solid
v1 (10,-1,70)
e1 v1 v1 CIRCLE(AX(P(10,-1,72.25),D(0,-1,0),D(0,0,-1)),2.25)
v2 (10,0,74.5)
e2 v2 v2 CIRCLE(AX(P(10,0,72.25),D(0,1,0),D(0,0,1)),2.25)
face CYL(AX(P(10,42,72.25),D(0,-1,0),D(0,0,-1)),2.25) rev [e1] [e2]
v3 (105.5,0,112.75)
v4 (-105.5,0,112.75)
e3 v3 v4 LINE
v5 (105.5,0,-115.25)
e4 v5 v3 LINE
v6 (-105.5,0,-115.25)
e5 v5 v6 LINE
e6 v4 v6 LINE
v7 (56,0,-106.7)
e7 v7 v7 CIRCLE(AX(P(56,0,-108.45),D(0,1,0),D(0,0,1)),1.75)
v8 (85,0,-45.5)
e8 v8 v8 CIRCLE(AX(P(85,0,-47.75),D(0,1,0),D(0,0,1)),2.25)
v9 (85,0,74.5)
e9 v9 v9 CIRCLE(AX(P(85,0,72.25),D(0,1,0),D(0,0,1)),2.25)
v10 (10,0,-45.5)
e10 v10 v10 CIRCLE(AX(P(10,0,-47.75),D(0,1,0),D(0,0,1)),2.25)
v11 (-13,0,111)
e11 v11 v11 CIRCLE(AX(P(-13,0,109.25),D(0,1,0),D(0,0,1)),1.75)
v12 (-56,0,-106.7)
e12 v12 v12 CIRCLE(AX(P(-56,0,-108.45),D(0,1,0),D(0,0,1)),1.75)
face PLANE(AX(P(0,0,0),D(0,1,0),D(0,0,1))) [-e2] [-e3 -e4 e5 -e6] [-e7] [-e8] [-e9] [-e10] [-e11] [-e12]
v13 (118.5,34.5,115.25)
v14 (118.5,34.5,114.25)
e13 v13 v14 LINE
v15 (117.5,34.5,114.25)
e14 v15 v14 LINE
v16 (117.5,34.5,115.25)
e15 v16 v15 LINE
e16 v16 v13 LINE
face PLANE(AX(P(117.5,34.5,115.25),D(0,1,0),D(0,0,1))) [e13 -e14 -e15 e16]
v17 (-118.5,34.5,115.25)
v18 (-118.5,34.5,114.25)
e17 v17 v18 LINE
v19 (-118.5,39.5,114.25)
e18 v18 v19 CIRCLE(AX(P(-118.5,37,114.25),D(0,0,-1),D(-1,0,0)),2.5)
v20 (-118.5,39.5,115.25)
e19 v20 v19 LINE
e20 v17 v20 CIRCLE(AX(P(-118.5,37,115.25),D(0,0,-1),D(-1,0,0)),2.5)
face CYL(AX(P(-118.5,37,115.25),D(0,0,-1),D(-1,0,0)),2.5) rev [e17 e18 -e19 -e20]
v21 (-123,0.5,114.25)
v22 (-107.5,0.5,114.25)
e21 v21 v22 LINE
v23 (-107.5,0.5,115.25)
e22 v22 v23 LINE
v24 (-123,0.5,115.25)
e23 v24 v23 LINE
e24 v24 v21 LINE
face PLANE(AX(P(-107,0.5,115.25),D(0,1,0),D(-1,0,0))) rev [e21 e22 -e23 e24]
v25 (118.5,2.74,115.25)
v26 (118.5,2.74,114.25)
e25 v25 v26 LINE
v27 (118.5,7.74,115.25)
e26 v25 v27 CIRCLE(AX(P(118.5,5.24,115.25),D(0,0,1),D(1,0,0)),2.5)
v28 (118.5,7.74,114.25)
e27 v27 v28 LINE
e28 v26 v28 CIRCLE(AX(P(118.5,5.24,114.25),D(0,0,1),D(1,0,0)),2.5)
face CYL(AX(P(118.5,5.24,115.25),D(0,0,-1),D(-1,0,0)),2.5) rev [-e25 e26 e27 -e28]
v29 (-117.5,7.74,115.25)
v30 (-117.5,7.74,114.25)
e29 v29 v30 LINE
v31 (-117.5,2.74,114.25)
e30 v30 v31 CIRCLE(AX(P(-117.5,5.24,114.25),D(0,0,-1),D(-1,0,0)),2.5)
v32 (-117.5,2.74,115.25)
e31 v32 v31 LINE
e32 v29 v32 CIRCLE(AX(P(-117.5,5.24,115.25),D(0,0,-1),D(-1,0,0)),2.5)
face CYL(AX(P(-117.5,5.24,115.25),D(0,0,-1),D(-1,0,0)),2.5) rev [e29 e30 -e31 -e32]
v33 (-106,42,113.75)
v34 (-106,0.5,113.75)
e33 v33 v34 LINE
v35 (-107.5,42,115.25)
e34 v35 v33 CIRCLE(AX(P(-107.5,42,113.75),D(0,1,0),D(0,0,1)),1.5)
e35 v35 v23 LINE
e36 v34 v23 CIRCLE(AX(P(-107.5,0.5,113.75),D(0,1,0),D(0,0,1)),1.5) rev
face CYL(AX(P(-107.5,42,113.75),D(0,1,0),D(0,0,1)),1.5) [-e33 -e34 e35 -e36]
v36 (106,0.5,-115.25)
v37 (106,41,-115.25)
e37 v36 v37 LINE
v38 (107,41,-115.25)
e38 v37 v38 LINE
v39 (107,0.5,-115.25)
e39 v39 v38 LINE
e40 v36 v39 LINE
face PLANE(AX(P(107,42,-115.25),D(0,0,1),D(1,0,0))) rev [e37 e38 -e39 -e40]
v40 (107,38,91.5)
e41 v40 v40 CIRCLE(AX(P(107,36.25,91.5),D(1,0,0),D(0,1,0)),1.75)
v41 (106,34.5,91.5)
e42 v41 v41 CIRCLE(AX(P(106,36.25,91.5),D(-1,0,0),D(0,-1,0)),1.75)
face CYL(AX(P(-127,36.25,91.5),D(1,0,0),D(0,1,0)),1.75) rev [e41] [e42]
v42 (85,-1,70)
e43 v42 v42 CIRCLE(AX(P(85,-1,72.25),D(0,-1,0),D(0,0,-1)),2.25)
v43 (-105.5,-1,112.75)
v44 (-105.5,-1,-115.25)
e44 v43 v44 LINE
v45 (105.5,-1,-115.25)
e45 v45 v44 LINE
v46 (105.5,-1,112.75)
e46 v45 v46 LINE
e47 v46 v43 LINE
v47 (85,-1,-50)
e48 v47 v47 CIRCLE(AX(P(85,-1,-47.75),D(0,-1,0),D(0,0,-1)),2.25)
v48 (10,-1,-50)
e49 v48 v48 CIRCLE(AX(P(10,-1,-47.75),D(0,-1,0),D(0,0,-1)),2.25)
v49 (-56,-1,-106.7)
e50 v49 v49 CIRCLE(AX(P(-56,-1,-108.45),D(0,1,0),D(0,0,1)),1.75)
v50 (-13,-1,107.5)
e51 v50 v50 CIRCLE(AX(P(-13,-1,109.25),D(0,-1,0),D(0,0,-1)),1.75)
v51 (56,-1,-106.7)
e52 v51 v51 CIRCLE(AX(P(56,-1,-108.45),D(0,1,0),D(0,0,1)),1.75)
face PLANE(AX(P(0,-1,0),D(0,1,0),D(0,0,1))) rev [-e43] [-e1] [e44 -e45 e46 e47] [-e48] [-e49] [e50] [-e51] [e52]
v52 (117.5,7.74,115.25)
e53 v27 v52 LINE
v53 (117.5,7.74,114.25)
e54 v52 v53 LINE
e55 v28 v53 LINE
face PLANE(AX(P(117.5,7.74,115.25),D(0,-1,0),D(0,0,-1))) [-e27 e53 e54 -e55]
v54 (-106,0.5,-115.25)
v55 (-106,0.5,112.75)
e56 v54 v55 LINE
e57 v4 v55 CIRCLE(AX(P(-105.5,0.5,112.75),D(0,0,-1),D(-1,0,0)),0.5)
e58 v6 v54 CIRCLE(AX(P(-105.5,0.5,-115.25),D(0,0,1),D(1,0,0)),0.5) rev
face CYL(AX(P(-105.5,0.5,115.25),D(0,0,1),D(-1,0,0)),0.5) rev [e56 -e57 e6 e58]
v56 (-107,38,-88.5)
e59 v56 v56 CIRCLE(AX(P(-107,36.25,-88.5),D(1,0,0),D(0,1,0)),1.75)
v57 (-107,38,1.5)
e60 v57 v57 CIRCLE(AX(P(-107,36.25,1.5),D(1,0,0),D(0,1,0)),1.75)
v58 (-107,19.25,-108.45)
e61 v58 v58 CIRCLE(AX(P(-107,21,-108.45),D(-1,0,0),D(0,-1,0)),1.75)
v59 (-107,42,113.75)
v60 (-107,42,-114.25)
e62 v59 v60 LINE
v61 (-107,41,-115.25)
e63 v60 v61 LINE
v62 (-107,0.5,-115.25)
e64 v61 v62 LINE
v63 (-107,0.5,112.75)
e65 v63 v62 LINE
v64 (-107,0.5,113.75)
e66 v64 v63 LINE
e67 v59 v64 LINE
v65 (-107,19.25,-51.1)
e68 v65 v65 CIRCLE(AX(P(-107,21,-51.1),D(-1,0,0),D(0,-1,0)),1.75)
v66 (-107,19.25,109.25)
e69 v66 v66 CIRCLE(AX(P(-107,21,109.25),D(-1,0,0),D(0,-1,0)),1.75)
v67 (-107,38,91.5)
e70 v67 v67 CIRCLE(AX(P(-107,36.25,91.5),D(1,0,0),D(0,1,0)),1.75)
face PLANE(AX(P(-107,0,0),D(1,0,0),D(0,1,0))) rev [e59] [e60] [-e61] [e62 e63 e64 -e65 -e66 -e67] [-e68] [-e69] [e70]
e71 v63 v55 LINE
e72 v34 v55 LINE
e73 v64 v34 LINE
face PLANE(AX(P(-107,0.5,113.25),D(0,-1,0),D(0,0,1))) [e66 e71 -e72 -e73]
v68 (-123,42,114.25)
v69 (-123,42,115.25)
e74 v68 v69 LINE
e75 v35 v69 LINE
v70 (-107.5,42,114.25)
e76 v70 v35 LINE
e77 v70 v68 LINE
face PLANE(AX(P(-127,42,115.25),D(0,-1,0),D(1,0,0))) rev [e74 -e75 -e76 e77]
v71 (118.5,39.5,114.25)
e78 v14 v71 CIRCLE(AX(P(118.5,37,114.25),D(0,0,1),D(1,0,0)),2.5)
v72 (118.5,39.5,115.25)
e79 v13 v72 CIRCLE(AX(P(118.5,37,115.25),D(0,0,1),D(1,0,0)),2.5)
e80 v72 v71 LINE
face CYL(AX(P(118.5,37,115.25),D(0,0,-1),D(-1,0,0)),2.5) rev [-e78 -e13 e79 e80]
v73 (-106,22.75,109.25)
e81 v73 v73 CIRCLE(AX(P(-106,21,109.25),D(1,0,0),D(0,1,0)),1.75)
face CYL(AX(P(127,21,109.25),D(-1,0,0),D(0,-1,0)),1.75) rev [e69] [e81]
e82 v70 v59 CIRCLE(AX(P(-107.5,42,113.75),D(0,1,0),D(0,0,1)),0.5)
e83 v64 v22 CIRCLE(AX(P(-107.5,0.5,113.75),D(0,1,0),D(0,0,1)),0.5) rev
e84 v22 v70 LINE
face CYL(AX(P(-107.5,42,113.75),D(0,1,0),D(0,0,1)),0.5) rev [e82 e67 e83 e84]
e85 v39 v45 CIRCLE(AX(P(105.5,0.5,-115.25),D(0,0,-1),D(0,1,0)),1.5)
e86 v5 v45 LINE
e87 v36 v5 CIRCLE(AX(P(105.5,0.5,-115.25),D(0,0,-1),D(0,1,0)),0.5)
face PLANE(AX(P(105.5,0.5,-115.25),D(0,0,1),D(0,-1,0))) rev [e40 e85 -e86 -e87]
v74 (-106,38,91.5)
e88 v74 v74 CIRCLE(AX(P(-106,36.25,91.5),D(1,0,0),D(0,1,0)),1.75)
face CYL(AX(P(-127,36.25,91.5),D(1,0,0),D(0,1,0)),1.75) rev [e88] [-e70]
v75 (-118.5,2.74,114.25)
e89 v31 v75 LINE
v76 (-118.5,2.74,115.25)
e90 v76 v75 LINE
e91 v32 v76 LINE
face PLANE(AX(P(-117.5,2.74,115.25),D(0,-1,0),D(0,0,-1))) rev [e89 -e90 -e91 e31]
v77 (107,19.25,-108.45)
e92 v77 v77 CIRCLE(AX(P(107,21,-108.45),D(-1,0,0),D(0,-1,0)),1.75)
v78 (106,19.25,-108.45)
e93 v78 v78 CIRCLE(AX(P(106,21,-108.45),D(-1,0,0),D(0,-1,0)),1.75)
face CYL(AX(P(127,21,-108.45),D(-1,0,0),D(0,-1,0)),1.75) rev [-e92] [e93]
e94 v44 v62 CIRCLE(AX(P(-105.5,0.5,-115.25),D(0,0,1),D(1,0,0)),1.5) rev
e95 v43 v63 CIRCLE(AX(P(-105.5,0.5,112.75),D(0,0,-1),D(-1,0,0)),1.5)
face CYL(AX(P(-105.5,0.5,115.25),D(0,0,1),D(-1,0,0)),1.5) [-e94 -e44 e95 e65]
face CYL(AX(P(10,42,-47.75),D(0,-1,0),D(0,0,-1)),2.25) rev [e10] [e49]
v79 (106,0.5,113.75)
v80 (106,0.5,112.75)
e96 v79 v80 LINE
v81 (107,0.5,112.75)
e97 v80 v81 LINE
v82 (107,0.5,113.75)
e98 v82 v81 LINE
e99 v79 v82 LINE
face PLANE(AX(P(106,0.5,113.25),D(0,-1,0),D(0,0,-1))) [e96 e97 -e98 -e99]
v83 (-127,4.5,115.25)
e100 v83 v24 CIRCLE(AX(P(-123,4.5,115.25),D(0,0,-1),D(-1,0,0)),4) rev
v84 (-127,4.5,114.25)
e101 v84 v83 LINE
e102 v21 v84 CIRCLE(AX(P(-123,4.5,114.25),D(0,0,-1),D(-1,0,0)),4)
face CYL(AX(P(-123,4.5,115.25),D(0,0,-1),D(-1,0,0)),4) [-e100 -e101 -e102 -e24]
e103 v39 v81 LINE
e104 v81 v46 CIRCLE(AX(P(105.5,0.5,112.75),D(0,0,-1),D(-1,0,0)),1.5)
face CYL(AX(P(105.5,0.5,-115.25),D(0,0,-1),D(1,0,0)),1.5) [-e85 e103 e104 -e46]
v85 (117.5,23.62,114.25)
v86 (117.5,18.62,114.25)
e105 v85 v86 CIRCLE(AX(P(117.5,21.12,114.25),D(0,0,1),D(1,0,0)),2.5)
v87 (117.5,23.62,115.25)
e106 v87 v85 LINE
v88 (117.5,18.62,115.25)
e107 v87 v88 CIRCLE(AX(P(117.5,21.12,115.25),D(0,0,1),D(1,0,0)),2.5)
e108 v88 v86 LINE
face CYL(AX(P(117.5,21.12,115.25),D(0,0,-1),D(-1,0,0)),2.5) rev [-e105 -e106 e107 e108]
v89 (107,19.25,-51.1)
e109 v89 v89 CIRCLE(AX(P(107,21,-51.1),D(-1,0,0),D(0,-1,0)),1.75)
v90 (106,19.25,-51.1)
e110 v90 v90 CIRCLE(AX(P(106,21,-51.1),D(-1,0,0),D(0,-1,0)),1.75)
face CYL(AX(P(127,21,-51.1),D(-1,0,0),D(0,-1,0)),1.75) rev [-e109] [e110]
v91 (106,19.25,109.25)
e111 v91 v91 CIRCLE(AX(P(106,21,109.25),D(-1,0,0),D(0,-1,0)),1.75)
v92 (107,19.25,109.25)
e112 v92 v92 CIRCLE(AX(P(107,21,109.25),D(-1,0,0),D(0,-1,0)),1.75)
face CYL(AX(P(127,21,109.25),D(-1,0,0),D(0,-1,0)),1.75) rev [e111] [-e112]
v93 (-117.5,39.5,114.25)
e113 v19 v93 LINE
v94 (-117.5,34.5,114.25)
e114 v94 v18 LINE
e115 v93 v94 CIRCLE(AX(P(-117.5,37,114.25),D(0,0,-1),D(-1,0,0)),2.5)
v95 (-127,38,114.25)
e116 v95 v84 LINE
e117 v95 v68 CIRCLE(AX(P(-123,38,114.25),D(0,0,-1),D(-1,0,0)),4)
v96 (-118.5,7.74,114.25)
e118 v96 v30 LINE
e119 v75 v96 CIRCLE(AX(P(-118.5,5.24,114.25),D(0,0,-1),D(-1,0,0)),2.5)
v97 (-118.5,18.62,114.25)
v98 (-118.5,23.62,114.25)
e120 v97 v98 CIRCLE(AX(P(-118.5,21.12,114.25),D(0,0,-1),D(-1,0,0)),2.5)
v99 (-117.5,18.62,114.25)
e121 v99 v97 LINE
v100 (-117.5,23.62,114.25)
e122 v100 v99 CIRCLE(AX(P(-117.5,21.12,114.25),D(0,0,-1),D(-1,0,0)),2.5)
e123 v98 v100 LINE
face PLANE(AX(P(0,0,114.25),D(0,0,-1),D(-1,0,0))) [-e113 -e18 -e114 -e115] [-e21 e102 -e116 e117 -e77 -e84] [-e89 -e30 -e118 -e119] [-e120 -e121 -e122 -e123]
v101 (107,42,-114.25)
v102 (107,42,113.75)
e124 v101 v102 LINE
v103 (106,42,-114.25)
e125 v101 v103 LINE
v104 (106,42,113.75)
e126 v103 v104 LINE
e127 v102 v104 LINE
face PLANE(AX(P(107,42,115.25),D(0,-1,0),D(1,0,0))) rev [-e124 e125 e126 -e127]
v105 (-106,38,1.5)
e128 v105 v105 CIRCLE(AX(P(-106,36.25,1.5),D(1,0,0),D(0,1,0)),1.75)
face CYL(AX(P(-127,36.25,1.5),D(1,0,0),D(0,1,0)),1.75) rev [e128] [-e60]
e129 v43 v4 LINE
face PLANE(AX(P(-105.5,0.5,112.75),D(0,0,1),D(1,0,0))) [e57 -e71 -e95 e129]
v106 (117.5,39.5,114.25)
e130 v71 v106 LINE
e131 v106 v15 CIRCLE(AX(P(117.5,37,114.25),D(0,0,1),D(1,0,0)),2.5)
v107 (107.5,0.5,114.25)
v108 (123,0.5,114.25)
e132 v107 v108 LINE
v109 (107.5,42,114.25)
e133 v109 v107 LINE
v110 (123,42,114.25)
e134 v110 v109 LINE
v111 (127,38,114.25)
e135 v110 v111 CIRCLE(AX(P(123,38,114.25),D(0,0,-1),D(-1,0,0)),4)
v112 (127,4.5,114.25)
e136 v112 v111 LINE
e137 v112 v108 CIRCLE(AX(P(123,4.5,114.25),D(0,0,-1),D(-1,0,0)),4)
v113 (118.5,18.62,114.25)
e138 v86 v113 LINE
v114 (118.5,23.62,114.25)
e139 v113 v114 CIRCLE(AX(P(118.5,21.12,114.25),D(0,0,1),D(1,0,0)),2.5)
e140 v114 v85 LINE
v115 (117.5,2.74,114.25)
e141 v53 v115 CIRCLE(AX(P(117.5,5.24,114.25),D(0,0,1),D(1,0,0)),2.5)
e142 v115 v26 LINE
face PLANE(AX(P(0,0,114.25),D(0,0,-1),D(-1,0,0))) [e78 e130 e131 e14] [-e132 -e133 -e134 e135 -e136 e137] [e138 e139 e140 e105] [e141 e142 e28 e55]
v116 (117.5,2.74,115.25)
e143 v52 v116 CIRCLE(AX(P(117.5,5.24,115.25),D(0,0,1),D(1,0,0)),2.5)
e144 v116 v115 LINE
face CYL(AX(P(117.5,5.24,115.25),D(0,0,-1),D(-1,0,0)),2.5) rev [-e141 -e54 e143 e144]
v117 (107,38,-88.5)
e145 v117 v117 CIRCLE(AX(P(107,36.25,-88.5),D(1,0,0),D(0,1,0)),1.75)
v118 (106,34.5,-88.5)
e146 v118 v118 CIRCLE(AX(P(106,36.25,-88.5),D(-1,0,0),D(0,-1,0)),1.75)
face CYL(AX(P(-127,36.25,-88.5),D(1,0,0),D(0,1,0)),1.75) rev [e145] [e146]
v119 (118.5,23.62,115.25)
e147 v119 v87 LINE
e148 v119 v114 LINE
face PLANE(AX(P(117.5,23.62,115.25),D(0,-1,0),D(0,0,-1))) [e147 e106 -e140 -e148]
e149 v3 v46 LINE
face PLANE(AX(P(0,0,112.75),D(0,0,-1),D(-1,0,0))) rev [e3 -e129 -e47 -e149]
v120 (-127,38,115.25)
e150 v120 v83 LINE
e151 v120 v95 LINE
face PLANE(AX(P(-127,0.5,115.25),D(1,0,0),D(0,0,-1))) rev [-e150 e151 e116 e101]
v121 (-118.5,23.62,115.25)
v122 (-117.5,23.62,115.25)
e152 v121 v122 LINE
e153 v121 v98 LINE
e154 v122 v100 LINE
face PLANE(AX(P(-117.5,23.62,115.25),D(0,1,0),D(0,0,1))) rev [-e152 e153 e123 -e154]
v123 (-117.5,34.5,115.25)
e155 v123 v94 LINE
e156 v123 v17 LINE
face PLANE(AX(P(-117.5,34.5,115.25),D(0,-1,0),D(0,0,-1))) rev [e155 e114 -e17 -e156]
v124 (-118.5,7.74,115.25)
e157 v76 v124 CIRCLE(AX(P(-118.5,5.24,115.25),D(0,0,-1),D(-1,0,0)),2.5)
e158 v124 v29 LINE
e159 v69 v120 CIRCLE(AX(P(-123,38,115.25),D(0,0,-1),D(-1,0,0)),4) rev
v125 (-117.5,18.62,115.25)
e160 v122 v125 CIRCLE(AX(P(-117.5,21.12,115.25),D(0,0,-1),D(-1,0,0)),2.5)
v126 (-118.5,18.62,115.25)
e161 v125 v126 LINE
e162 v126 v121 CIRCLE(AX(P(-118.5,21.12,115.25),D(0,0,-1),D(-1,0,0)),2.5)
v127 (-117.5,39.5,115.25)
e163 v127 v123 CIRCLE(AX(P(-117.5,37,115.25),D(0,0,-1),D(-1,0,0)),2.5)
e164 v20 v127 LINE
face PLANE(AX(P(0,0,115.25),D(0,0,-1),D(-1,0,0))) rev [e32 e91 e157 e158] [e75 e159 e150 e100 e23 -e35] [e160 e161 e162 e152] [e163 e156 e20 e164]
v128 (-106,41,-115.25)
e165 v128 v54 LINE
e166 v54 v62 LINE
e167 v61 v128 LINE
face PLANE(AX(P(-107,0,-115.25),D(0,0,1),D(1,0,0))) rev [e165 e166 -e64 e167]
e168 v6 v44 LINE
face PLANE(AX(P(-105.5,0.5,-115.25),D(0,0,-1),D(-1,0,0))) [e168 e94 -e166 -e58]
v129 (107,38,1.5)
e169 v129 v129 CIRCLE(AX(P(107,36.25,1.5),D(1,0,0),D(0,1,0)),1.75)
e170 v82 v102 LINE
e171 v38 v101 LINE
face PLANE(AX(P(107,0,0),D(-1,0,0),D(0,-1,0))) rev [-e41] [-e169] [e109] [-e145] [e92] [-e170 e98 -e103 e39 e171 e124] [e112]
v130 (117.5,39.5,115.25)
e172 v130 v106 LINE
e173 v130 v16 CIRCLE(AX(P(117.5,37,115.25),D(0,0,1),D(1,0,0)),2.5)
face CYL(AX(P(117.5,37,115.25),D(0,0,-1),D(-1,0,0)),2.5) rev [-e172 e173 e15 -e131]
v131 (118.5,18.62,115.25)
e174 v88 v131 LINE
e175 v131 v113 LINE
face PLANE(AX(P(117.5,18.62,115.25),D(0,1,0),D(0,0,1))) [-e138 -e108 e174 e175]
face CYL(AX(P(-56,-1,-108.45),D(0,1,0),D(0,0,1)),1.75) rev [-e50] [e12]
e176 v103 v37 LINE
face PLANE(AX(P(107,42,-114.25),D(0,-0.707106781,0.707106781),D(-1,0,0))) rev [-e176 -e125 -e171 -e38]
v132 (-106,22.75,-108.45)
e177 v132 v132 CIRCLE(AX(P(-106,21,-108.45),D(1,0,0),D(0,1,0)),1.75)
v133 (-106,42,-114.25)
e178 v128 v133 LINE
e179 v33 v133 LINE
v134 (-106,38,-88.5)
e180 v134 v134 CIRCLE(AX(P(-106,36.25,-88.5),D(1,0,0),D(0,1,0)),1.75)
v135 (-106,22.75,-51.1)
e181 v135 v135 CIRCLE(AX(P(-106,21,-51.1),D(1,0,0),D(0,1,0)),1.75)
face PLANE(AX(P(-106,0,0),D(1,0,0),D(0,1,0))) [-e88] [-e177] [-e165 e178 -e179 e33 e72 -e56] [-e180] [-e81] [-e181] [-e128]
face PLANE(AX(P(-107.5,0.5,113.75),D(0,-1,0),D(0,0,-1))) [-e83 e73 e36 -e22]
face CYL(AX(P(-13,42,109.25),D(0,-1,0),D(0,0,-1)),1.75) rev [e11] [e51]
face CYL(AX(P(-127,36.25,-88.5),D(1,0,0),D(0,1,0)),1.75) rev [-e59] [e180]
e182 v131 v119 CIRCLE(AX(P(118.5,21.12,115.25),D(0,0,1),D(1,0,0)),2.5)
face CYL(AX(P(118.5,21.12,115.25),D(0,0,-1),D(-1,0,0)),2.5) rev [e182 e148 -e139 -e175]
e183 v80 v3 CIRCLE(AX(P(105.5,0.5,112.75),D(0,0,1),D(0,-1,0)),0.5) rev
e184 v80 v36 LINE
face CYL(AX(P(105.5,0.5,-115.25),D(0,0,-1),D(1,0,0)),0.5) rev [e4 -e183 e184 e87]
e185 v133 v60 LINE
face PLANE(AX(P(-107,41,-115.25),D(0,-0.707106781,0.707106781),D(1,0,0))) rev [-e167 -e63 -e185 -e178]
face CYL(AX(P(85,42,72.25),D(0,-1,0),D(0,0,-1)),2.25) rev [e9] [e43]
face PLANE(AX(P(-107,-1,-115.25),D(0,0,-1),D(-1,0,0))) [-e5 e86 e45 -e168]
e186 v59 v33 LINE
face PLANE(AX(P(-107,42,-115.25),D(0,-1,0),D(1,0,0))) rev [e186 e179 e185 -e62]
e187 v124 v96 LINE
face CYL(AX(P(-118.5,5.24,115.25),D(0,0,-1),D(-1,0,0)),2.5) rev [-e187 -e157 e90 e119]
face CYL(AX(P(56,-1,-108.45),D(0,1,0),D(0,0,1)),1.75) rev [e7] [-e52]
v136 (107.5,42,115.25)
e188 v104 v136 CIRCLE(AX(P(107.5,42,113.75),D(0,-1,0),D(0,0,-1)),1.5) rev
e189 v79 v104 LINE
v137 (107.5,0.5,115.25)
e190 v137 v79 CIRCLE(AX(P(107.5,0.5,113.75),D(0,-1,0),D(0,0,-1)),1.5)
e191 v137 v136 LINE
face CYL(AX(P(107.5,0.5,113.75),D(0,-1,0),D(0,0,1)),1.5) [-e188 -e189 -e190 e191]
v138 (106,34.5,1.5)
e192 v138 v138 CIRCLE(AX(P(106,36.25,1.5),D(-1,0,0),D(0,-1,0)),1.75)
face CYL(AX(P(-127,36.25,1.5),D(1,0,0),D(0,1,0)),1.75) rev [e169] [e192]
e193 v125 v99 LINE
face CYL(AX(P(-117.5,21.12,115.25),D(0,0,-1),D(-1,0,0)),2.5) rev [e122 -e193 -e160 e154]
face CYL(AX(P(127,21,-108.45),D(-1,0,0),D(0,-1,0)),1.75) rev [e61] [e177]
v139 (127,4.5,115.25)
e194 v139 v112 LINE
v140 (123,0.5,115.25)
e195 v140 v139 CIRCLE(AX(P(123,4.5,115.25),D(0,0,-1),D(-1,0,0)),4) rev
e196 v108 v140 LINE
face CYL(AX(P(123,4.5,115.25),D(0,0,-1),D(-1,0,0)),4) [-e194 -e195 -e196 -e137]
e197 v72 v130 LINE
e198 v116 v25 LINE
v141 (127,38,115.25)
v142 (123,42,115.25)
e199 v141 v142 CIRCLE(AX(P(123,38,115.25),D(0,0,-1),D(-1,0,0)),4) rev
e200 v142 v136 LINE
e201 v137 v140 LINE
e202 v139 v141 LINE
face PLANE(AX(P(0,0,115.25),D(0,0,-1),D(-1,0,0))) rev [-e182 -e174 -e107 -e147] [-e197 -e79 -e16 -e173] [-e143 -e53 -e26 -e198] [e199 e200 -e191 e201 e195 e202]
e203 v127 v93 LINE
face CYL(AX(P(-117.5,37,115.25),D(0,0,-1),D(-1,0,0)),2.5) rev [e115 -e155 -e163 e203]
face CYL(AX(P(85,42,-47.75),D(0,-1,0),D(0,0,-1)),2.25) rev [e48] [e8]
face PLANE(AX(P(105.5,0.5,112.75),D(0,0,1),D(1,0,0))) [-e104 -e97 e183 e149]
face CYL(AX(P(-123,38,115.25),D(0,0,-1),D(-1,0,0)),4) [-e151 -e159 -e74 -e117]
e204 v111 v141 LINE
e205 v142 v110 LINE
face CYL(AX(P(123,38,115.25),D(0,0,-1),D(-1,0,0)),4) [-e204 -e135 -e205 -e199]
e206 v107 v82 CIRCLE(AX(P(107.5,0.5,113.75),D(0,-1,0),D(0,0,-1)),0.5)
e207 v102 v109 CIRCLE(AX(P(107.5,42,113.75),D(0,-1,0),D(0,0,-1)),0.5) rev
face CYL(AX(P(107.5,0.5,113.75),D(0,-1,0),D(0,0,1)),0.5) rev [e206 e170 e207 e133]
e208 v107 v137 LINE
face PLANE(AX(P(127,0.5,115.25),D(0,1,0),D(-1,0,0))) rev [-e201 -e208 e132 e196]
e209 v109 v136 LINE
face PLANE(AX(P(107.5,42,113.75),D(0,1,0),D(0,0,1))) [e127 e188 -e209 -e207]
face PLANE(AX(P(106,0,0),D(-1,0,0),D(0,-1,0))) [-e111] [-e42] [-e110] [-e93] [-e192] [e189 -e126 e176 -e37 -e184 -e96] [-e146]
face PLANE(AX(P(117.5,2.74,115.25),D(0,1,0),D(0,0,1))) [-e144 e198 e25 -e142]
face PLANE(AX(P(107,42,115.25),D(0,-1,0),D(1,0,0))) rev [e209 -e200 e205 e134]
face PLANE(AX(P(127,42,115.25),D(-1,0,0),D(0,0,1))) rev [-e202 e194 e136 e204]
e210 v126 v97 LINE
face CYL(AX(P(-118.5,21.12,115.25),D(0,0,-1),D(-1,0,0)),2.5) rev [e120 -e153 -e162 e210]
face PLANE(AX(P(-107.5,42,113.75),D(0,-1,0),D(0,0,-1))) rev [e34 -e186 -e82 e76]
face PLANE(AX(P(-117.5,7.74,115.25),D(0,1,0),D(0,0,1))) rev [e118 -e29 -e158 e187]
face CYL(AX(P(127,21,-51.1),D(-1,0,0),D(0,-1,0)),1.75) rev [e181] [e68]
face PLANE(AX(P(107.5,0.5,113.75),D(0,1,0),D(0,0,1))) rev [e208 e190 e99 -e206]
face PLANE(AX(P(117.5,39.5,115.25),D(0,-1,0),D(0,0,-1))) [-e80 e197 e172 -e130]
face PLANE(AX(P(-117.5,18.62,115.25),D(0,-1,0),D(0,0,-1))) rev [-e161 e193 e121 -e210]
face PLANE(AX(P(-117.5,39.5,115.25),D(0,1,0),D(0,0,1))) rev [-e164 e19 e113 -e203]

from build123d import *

# Parameters (mm, degrees)
SKETCH1_W                    = 214
SKETCH1_H                    = 230.5
BASE_FLANGE1_DEPTH           = 1
EDGE_FLANGE3_STRIP_W         = 5
EDGE_FLANGE3_STRIP_H         = 1
EDGE_FLANGE3_STRIP_CUT_DEPTH = 230.5
EDGE_FLANGE3_DEPTH           = 230.5
EDGE_FLANGE4_STRIP_W         = 5
EDGE_FLANGE4_STRIP_H         = 1
EDGE_FLANGE4_STRIP_CUT_DEPTH = 230.5
EDGE_FLANGE4_DEPTH           = 230.5
EDGE_FLANGE5_STRIP_W         = 5
EDGE_FLANGE5_STRIP_H         = 1
EDGE_FLANGE5_STRIP_CUT_DEPTH = 41.5
EDGE_FLANGE5_DEPTH           = 41.5
EDGE_FLANGE6_STRIP_W         = 5
EDGE_FLANGE6_STRIP_H         = 1
EDGE_FLANGE6_STRIP_CUT_DEPTH = 41.5
EDGE_FLANGE6_DEPTH           = 41.5
FILLET1_R                    = 4
CUT_EXTRUDE1_REACH           = 178.807
SKETCH24_W                   = 214
SKETCH24_H                   = 2.5
SKETCH26_R                   = 2.5
CUT_EXTRUDE2_DEPTH           = 10
SKETCH27_R                   = 1.75
CUT_EXTRUDE3_DEPTH           = 265.201745831
SKETCH28_R                   = 2.25
CUT_EXTRUDE4_DEPTH           = 177.806568034
SKETCH29_R                   = 1.75
CUT_EXTRUDE5_DEPTH           = 177.566028726
SKETCH30_R                   = 1.75
CUT_EXTRUDE6_DEPTH           = 265.201745831
SKETCH31_R                   = 1.75
CUT_EXTRUDE7_DEPTH           = 265.201745831
CHAMFER1_SIZE                = 1
CUT_EXTRUDE8_DEPTH           = 266.637440885
SKETCH33_R                   = 1.75
CUT_EXTRUDE9_DEPTH           = 177.806568034
SKETCH34_R                   = 1.75
CUT_EXTRUDE10_DEPTH          = 265.201745831


# Sheet-metal steps are written as plain solids
with BuildPart() as part:
    # Sketch1 → Base-Flange1 (new body)
    with BuildSketch(Plane(origin=(0, 0, 0), x_dir=(1, 0, 0), z_dir=(0, 1, 0))):
        Rectangle(SKETCH1_W, SKETCH1_H)
    extrude(amount=-BASE_FLANGE1_DEPTH)

    # Edge-Flange3 strip (across the edge) → Edge-Flange3 strip cut (cut)
    with BuildSketch(Plane(origin=(-107, 0, -115.25), x_dir=(1, 0, 0), z_dir=(0, 0, 1))):
        with Locations((-1, -0.5)):
            Rectangle(EDGE_FLANGE3_STRIP_W, EDGE_FLANGE3_STRIP_H)
    extrude(amount=EDGE_FLANGE3_STRIP_CUT_DEPTH, mode=Mode.SUBTRACT)

    # Edge-Flange3 section (across the edge) → Edge-Flange3 (add)
    with BuildSketch(Plane(origin=(-107, 0, -115.25), x_dir=(1, 0, 0), z_dir=(0, 0, 1))):
        with BuildLine():
            Line((0, 0.5), (0, 42))
            Line((0, 42), (1, 42))
            Line((1, 42), (1, 0.5))
            ThreePointArc((1, 0.5), (1.146446609, 0.146446609), (1.5, 0))
            Line((1.5, 0), (1.5, -1))
            ThreePointArc((1.5, -1), (0.439339828, -0.560660172), (0, 0.5))
        make_face()
    extrude(amount=EDGE_FLANGE3_DEPTH)

    # Edge-Flange4 strip (across the edge) → Edge-Flange4 strip cut (cut)
    with BuildSketch(Plane(origin=(107, 0, 115.25), x_dir=(-1, 0, 0), z_dir=(0, 0, -1))):
        with Locations((-1, -0.5)):
            Rectangle(EDGE_FLANGE4_STRIP_W, EDGE_FLANGE4_STRIP_H)
    extrude(amount=EDGE_FLANGE4_STRIP_CUT_DEPTH, mode=Mode.SUBTRACT)

    # Edge-Flange4 section (across the edge) → Edge-Flange4 (add)
    with BuildSketch(Plane(origin=(107, 0, 115.25), x_dir=(-1, 0, 0), z_dir=(0, 0, -1))):
        with BuildLine():
            Line((0, 0.5), (0, 42))
            Line((0, 42), (1, 42))
            Line((1, 42), (1, 0.5))
            ThreePointArc((1, 0.5), (1.146446609, 0.146446609), (1.5, 0))
            Line((1.5, 0), (1.5, -1))
            ThreePointArc((1.5, -1), (0.439339828, -0.560660172), (0, 0.5))
        make_face()
    extrude(amount=EDGE_FLANGE4_DEPTH)

    # Edge-Flange5 strip (across the edge) → Edge-Flange5 strip cut (cut)
    with BuildSketch(Plane(origin=(107, 42, 115.25), x_dir=(0, 0, -1), z_dir=(0, -1, 0))):
        with Locations((-1, -0.5)):
            Rectangle(EDGE_FLANGE5_STRIP_W, EDGE_FLANGE5_STRIP_H)
    extrude(amount=EDGE_FLANGE5_STRIP_CUT_DEPTH, mode=Mode.SUBTRACT)

    # Edge-Flange5 section (across the edge) → Edge-Flange5 (add)
    with BuildSketch(Plane(origin=(107, 42, 115.25), x_dir=(0, 0, -1), z_dir=(0, -1, 0))):
        with BuildLine():
            Line((0, 0.5), (0, 20))
            Line((0, 20), (1, 20))
            Line((1, 20), (1, 0.5))
            ThreePointArc((1, 0.5), (1.146446609, 0.146446609), (1.5, 0))
            Line((1.5, 0), (1.5, -1))
            ThreePointArc((1.5, -1), (0.439339828, -0.560660172), (0, 0.5))
        make_face()
    extrude(amount=EDGE_FLANGE5_DEPTH)

    # Edge-Flange6 strip (across the edge) → Edge-Flange6 strip cut (cut)
    with BuildSketch(Plane(origin=(-107, 0.5, 115.25), x_dir=(0, 0, -1), z_dir=(0, 1, 0))):
        with Locations((-1, -0.5)):
            Rectangle(EDGE_FLANGE6_STRIP_W, EDGE_FLANGE6_STRIP_H)
    extrude(amount=EDGE_FLANGE6_STRIP_CUT_DEPTH, mode=Mode.SUBTRACT)

    # Edge-Flange6 section (across the edge) → Edge-Flange6 (add)
    with BuildSketch(Plane(origin=(-107, 0.5, 115.25), x_dir=(0, 0, -1), z_dir=(0, 1, 0))):
        with BuildLine():
            Line((0, 0.5), (0, 20))
            Line((0, 20), (1, 20))
            Line((1, 20), (1, 0.5))
            ThreePointArc((1, 0.5), (1.146446609, 0.146446609), (1.5, 0))
            Line((1.5, 0), (1.5, -1))
            ThreePointArc((1.5, -1), (0.439339828, -0.560660172), (0, 0.5))
        make_face()
    extrude(amount=EDGE_FLANGE6_DEPTH)

    # Fillet1
    fillet1_edges = [part.edges().sort_by_distance(p)[0] for p in [
        (127, 42, 114.75),
        (127, 0.5, 114.75),
        (-127, 0.5, 114.75),
        (-127, 42, 114.75),
    ]]
    fillet(fillet1_edges, radius=FILLET1_R)

    # Cut-Extrude1: up to this face of the body (flat: up to its plane)
    cut_extrude1_end = Plane(part.part.faces().sort_by_distance((114.980552593, 0.5, 114.747536063))[0])
    # Sketch24 → Cut-Extrude1 (cut, up to the picked face)
    with BuildSketch(Plane.XZ.offset(1), mode=Mode.PRIVATE) as cut_extrude1_sk1:
        with Locations((0, 114)):
            Rectangle(SKETCH24_W, SKETCH24_H)
    cut_extrude1_tool1 = split(extrude(cut_extrude1_sk1.sketch, amount=-CUT_EXTRUDE1_REACH, mode=Mode.PRIVATE), bisect_by=cut_extrude1_end, keep=Keep.BOTH, mode=Mode.PRIVATE)
    add(cut_extrude1_tool1.solids().sort_by(Axis((0, -1, 114), (0, 1, 0)))[0], mode=Mode.SUBTRACT)

    # Sketch26 → Cut-Extrude2 (cut)
    with BuildSketch(Plane.XY.offset(115.25)):
        with Locations((-118, 37)):
            Circle(SKETCH26_R)
        with Locations((-118, 5.24)):
            Circle(SKETCH26_R)
        with Locations((-118, 21.12)):
            Circle(SKETCH26_R)
        with Locations(Location((118, 5.24, 0), (0, 0, 180))):
            Circle(SKETCH26_R)
        with Locations(Location((118, 21.12, 0), (0, 0, 180))):
            Circle(SKETCH26_R)
        with Locations(Location((118, 37, 0), (0, 0, 180))):
            Circle(SKETCH26_R)
    extrude(amount=-CUT_EXTRUDE2_DEPTH, mode=Mode.SUBTRACT)

    # Sketch27 → Cut-Extrude3 (cut, through all)
    with BuildSketch(Plane(origin=(107, 0, 0), x_dir=(0, 0, -1), z_dir=(1, 0, 0))):
        with Locations(Location((-91.5, 36.25, 0), (0, 0, 90))):
            Circle(SKETCH27_R)
        with Locations(Location((-1.5, 36.25, 0), (0, 0, 90))):
            Circle(SKETCH27_R)
        with Locations(Location((88.5, 36.25, 0), (0, 0, 90))):
            Circle(SKETCH27_R)
    extrude(amount=-CUT_EXTRUDE3_DEPTH, mode=Mode.SUBTRACT)

    # Sketch28 → Cut-Extrude4 (cut, through all)
    with BuildSketch(Plane.XZ.offset(1)):
        with Locations(Location((10, 72.25, 0), (0, 0, 270))):
            Circle(SKETCH28_R)
        with Locations(Location((85, 72.25, 0), (0, 0, 270))):
            Circle(SKETCH28_R)
        with Locations(Location((10, -47.75, 0), (0, 0, 270))):
            Circle(SKETCH28_R)
        with Locations(Location((85, -47.75, 0), (0, 0, 270))):
            Circle(SKETCH28_R)
    extrude(amount=-CUT_EXTRUDE4_DEPTH, mode=Mode.SUBTRACT)

    # Sketch29 → Cut-Extrude5 (cut, through all)
    with BuildSketch(Plane(origin=(0, 0, 0), x_dir=(1, 0, 0), z_dir=(0, 1, 0))):
        with Locations(Location((56, 108.45, 0), (0, 0, 270))):
            Circle(SKETCH29_R)
        with Locations(Location((-56, 108.45, 0), (0, 0, 270))):
            Circle(SKETCH29_R)
    extrude(amount=-CUT_EXTRUDE5_DEPTH, mode=Mode.SUBTRACT)

    # Sketch30 → Cut-Extrude6 (cut, through all)
    with BuildSketch(Plane.ZY.offset(107)):
        with Locations(Location((-51.1, 21, 0), (0, 0, 270))):
            Circle(SKETCH30_R)
    extrude(amount=-CUT_EXTRUDE6_DEPTH, mode=Mode.SUBTRACT)

    # Sketch31 → Cut-Extrude7 (cut, through all)
    with BuildSketch(Plane.ZY.offset(107)):
        with Locations(Location((-108.45, 21, 0), (0, 0, 270))):
            Circle(SKETCH31_R)
    extrude(amount=-CUT_EXTRUDE7_DEPTH, mode=Mode.SUBTRACT)

    # Chamfer1
    chamfer1_edges = [part.edges().sort_by_distance(p)[0] for p in [
        (-106.5, 42, -115.25),
        (106.5, 42, -115.25),
    ]]
    chamfer(chamfer1_edges, length=CHAMFER1_SIZE)

    # Sketch32 → Cut-Extrude8 (cut, through all)
    with BuildSketch(Plane(origin=(0, 0, 114.25), x_dir=(-1, 0, 0), z_dir=(0, 0, -1))):
        with BuildLine():
            Line((117.5, 39.5), (118.5, 39.5))
            ThreePointArc((118.5, 39.5), (121, 37), (118.5, 34.5))
            Line((118.5, 34.5), (117.5, 34.5))
            ThreePointArc((117.5, 34.5), (115, 37), (117.5, 39.5))
        make_face()
        with BuildLine():
            Line((117.5, 23.62), (118.5, 23.62))
            ThreePointArc((118.5, 23.62), (121, 21.12), (118.5, 18.62))
            Line((118.5, 18.62), (117.5, 18.62))
            ThreePointArc((117.5, 18.62), (115, 21.12), (117.5, 23.62))
        make_face()
        with BuildLine():
            Line((117.5, 7.74), (118.5, 7.74))
            ThreePointArc((118.5, 7.74), (121, 5.24), (118.5, 2.74))
            Line((118.5, 2.74), (117.5, 2.74))
            ThreePointArc((117.5, 2.74), (115, 5.24), (117.5, 7.74))
        make_face()
    cut_extrude8 = extrude(amount=-CUT_EXTRUDE8_DEPTH, mode=Mode.SUBTRACT)

    # Mirror1: Cut-Extrude8 across plane
    add(cut_extrude8.mirror(Plane(origin=(0, 0, 0), x_dir=(0, 0, 1), z_dir=(1, 0, 0))), mode=Mode.SUBTRACT)

    # Sketch33 → Cut-Extrude9 (cut, through all)
    with BuildSketch(Plane.XZ.offset(1)):
        with Locations(Location((-13, 109.25, 0), (0, 0, 270))):
            Circle(SKETCH33_R)
    extrude(amount=-CUT_EXTRUDE9_DEPTH, mode=Mode.SUBTRACT)

    # Sketch34 → Cut-Extrude10 (cut, through all)
    with BuildSketch(Plane.ZY.offset(107)):
        with Locations(Location((109.25, 21, 0), (0, 0, 270))):
            Circle(SKETCH34_R)
    extrude(amount=-CUT_EXTRUDE10_DEPTH, mode=Mode.SUBTRACT)


solid = part.part
